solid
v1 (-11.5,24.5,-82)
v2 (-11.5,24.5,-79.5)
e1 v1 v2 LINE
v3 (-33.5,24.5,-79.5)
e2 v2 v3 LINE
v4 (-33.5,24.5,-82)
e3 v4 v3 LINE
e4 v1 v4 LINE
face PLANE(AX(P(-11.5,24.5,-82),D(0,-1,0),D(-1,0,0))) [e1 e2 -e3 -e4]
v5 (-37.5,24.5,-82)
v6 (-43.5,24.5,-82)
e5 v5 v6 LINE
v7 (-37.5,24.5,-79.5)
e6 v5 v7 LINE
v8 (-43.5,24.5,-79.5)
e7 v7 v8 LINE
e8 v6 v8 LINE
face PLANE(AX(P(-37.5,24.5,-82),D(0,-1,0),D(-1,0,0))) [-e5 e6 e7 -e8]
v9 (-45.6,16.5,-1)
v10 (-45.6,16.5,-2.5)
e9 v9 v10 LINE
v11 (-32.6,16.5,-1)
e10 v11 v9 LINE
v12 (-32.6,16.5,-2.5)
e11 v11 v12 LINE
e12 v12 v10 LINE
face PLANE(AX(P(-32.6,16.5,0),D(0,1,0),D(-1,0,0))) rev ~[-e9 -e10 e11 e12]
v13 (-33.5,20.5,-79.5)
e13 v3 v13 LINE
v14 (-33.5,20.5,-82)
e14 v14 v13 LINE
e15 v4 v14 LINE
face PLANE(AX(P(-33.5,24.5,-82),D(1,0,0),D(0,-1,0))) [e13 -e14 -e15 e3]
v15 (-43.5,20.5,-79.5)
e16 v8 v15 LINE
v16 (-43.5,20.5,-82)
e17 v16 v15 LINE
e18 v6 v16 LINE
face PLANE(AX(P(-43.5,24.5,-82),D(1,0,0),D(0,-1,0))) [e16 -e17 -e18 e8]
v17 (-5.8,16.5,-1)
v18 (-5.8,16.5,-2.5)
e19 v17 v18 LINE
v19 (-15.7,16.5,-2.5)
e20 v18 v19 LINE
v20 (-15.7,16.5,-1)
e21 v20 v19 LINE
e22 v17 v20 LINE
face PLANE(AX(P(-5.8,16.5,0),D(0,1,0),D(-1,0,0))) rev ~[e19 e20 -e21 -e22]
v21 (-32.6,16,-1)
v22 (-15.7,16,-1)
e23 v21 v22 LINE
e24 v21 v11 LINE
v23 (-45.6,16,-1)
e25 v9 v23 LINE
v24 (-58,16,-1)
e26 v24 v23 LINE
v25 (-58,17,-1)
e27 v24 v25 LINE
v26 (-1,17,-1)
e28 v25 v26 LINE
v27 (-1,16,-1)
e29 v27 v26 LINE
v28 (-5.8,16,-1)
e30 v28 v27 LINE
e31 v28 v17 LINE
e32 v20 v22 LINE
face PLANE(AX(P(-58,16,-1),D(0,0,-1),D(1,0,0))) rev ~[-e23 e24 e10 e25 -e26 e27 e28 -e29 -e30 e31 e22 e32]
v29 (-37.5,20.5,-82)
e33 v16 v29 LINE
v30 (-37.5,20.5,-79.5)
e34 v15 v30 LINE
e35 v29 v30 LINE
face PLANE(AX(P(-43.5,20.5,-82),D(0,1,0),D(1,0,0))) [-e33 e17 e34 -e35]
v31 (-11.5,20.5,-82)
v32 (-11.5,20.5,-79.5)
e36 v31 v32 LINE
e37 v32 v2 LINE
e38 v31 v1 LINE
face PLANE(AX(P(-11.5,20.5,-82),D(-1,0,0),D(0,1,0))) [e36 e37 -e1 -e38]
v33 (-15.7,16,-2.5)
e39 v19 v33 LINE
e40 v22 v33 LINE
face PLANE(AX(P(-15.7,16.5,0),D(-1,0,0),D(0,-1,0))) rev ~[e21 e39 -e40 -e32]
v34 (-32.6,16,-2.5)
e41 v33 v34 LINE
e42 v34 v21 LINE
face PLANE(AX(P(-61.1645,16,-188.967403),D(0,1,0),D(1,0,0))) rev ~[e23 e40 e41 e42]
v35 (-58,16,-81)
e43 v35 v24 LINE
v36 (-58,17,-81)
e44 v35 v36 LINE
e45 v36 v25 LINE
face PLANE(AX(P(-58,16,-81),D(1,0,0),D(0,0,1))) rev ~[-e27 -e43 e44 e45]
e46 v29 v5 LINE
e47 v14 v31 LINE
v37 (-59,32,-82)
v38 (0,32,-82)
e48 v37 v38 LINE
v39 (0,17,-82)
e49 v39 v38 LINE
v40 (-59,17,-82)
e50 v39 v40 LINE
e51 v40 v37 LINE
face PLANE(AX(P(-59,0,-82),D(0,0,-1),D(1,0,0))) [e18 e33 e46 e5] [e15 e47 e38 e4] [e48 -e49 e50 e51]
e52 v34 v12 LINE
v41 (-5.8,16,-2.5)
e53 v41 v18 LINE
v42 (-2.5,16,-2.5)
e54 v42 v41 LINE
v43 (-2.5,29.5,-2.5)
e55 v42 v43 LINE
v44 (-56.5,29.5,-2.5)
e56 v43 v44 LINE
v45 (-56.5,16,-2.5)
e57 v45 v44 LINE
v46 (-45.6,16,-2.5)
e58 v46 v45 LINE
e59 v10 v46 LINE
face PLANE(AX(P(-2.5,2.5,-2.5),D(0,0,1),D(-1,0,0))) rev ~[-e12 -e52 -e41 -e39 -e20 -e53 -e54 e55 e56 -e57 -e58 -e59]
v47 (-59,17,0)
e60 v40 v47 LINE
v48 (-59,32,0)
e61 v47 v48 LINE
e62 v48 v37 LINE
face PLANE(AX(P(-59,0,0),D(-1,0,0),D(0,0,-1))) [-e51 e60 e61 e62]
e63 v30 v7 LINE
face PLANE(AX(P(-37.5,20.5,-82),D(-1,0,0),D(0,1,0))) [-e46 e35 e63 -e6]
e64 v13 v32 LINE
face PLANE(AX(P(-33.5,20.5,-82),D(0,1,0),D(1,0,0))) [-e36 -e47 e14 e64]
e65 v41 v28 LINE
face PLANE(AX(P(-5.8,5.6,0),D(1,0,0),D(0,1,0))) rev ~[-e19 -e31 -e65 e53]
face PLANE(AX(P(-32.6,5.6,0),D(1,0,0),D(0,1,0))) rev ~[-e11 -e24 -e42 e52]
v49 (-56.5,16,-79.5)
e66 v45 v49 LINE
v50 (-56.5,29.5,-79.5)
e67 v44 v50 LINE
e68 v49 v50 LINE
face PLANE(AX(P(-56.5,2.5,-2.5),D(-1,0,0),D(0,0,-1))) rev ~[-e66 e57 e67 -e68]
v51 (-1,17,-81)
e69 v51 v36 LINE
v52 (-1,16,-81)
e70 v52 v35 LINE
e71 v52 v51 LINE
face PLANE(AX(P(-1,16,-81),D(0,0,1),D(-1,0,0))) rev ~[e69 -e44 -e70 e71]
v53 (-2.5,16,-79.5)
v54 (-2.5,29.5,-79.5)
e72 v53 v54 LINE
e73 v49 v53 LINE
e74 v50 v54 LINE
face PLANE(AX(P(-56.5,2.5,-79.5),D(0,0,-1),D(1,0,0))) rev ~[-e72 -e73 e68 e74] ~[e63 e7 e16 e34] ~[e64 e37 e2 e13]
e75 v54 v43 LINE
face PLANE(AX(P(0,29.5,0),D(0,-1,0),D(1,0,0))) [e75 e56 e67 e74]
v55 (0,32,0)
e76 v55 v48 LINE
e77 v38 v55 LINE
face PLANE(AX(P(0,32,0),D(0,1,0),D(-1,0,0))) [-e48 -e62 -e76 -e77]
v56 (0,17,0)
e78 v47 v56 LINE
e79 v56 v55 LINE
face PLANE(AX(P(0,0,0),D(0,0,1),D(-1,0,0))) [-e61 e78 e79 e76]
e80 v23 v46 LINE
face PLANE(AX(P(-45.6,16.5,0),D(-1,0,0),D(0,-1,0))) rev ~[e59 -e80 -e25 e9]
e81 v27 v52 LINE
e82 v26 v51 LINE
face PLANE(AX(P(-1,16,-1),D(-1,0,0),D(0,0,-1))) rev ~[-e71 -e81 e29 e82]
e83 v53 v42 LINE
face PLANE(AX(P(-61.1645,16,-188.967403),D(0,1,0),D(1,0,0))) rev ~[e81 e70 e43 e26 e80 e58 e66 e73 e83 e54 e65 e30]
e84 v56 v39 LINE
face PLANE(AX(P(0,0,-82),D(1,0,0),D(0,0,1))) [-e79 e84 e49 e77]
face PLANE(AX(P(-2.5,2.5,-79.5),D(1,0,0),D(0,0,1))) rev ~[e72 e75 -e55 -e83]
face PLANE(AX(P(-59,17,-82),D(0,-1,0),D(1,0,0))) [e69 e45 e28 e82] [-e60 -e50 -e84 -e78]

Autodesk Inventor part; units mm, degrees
ref_plane "YZ Plane" through (0, 0, 0) normal (1, 0, 0) x (0, 1, 0)
ref_plane "XZ Plane" through (0, 0, 0) normal (0, 1, 0) x (-1, 0, 0)
sketch "Sketch1" plane through (0, 0, 0) normal (0, 1, 0) x (-1, 0, 0)
  line L0 (0, 0) -> (59, 0)
  line L1 (59, 0) -> (59, -82)
  line L2 (59, -82) -> (0, -82)
  line L3 (0, -82) -> (0, 0)
  dimension "d0" = 82
  dimension "d1" = 59
extrude "Extrusion1" add sketch "Sketch1" along normal blind 32
ref_plane "Work Plane1" through (0, 2.5, 0) normal (0, -1, 0) x (1, 0, 0)
sketch "Sketch2" plane through (0, 2.5, 0) normal (0, -1, 0) x (1, 0, 0)
  line L0 (-2.5, -2.5) -> (-56.5, -2.5)
  line L1 (-56.5, -2.5) -> (-56.5, -79.5)
  line L2 (-56.5, -79.5) -> (-2.5, -79.5)
  line L3 (-2.5, -79.5) -> (-2.5, -2.5)
  line L4 (0, 0) -> (0, -82) projected
  line L5 (-59, 0) -> (0, 0) projected
  line L6 (-59, -82) -> (-59, 0) projected
  line L7 (0, -82) -> (-59, -82) projected
  dimension "d5" = 2.5
  dimension "d6" = 2.5
  dimension "d7" = 2.5
  dimension "d8" = 2.5
extrude "Extrusion2" cut sketch "Sketch2" against normal blind 27 contours L3 L2 L1 L0
sketch "Sketch3" plane through (0, 2.5, 0) normal (0, -1, 0) x (1, 0, 0)
  line L0 (-3, -3) -> (-56, -3) construction
  line L1 (-56, -3) -> (-56, -79) construction
  line L2 (-56, -79) -> (-3, -79) construction
  line L3 (-3, -79) -> (-3, -3) construction
  line L4 (-2.5, -2.5) -> (-2.5, -79.5) projected
  line L5 (-56.5, -2.5) -> (-2.5, -2.5) projected
  line L6 (-56.5, -79.5) -> (-56.5, -2.5) projected
  line L7 (-2.5, -79.5) -> (-56.5, -79.5) projected
  circle A0 centre (-53.8, -24.59) radius 1.65
  circle A1 centre (-5.54, -23.32) radius 1.65
  circle A2 centre (-38.56, -75.39) radius 1.65
  circle A3 centre (-10.62, -75.39) radius 1.65
  point P0 (0, 0)
  dimension "d11" = 0.5
  dimension "d12" = 0.5
  dimension "d13" = 0.5
  dimension "d14" = 0.5
  dimension "d15" = 3.3
  dimension "d16" = 20.32
  dimension "d17" = 2.54
  dimension "d18" = 7.62
  dimension "d19" = 72.39
  dimension "d20" = 21.59
  dimension "d22" = 50.8
  dimension "d23" = 35.56
  dimension "d24" = 72.39
extrude "Extrusion3" cut sketch "Sketch3" along normal blind 27 contours A0 | A1 | A2 | A3
sketch "Sketch4" plane through (-59, 0, 0) normal (0, 0, 1) x (1, 0, 0)
  line L0 (13.4, 5.6) -> (26.4, 5.6)
  line L1 (26.4, 5.6) -> (26.4, 16.5)
  line L2 (26.4, 16.5) -> (13.4, 16.5)
  line L3 (13.4, 16.5) -> (13.4, 5.6)
  line L4 (43.3, 5.6) -> (53.2, 5.6)
  line L5 (53.2, 5.6) -> (53.2, 16.5)
  line L6 (53.2, 16.5) -> (43.3, 16.5)
  line L7 (43.3, 16.5) -> (43.3, 5.6)
  line L8 (56.5, 2.5) -> (2.5, 2.5) projected
  line L9 (2.5, 2.5) -> (2.5, 29.5) projected
  line L10 (56.5, 2.5) -> (56.5, 29.5) projected
  point P0 (59, 0)
  dimension "d27" = 13
  dimension "d28" = 10.9
  dimension "d29" = 9.9
  dimension "d31" = 14
  dimension "d32" = 10.9
  dimension "d33" = 3.3
extrude "Extrusion4" cut sketch "Sketch4" against normal blind 5
sketch "Sketch5" plane through (0, 0, -82) normal (0, 0, -1) x (-1, 0, 0)
  line L0 (11.5, 24.5) -> (33.5, 24.5)
  line L1 (33.5, 24.5) -> (33.5, 20.5)
  line L2 (33.5, 20.5) -> (11.5, 20.5)
  line L3 (11.5, 20.5) -> (11.5, 24.5)
  line L4 (37.5, 24.5) -> (43.5, 24.5)
  line L5 (43.5, 24.5) -> (43.5, 20.5)
  line L6 (43.5, 20.5) -> (37.5, 20.5)
  line L7 (37.5, 20.5) -> (37.5, 24.5)
  line L8 (56.5, 2.5) -> (2.5, 2.5) projected
  line L9 (2.5, 2.5) -> (2.5, 29.5) projected
  point P0 (0, 0)
  dimension "d36" = 22
  dimension "d37" = 4
  dimension "d38" = 4
  dimension "d39" = 22
  dimension "d40" = 9
  dimension "d41" = 6
  dimension "d42" = 4
extrude "Extrusion5" cut sketch "Sketch5" against normal blind 5
sketch "Sketch6" plane through (-59, 0, -82) normal (-1, 0, 0) x (0, 0, 1)
  circle A0 centre (57.41, 6) radius 1.6
  line L0 (79.5, 2.5) -> (79.5, 29.5) projected
  line L1 (82, 0) -> (0, 0) projected
  dimension "d45" = 3.2
  dimension "d46" = 22.09
  dimension "d47" = 6
sketch "Sketch7" plane through (0, 0, 0) normal (1, 0, 0) x (0, 0, -1)
  circle A0 centre (23.32, 6) radius 1.6
  line L0 (82, 0) -> (0, 0) projected
  line L1 (2.5, 2.5) -> (2.5, 29.5) projected
  dimension "d48" = 6
  dimension "d49" = 20.82
  dimension "d50" = 3.2
sketch "Sketch8" plane through (0, 0, -82) normal (0, 0, -1) x (-1, 0, 0)
  circle A0 centre (10.62, 6) radius 1.6
  circle A1 centre (38.56, 6) radius 1.6
  line L0 (59, 0) -> (0, 0) projected
  line L1 (2.5, 2.5) -> (2.5, 29.5) projected
  dimension "d51" = 3.2
  dimension "d52" = 3.2
  dimension "d53" = 6
  dimension "d54" = 6
  dimension "d55" = 8.12
  dimension "d56" = 36.06
extrude "Extrusion6" cut sketch "Sketch6" against normal blind 5
extrude "Extrusion7" cut sketch "Sketch7" against normal blind 5
extrude "Extrusion8" cut sketch "Sketch8" against normal blind 5
sketch "Sketch9" plane through (-59, 0, 0) normal (0, 0, 1) x (1, 0, 0)
  line L0 (-2.1645, 16) -> (66.4826, 16)
  line L1 (59, 0) -> (0, 0) projected
  dimension "d63" = 16
split body "Split1" sketch "Sketch9" result one side removed curves L0 removed pieces at (-32.4383, 0.5, -41.3152)
sketch "Sketch10" plane through (-59, 16, -82) normal (0, -1, 0) x (1, 0, 0)
  line L0 (0, 82) -> (59, 82) projected
  line L1 (59, 82) -> (59, 0) projected
  line L2 (0, 82) -> (59, 82)
  line L3 (59, 82) -> (59, 0)
  line L4 (59, 0) -> (0, 0)
  line L5 (0, 0) -> (0, 82)
  line L6 (58, 1) -> (1, 1)
  line L7 (1, 1) -> (1, 81)
  line L8 (1, 81) -> (58, 81)
  line L9 (58, 81) -> (58, 1)
  dimension "d64" = 1
  dimension "d65" = 1
  dimension "d66" = 1
  dimension "d67" = 1
extrude "Extrusion9" cut sketch "Sketch10" against normal blind 1
properties part number "Arduino_Box_Upper"
